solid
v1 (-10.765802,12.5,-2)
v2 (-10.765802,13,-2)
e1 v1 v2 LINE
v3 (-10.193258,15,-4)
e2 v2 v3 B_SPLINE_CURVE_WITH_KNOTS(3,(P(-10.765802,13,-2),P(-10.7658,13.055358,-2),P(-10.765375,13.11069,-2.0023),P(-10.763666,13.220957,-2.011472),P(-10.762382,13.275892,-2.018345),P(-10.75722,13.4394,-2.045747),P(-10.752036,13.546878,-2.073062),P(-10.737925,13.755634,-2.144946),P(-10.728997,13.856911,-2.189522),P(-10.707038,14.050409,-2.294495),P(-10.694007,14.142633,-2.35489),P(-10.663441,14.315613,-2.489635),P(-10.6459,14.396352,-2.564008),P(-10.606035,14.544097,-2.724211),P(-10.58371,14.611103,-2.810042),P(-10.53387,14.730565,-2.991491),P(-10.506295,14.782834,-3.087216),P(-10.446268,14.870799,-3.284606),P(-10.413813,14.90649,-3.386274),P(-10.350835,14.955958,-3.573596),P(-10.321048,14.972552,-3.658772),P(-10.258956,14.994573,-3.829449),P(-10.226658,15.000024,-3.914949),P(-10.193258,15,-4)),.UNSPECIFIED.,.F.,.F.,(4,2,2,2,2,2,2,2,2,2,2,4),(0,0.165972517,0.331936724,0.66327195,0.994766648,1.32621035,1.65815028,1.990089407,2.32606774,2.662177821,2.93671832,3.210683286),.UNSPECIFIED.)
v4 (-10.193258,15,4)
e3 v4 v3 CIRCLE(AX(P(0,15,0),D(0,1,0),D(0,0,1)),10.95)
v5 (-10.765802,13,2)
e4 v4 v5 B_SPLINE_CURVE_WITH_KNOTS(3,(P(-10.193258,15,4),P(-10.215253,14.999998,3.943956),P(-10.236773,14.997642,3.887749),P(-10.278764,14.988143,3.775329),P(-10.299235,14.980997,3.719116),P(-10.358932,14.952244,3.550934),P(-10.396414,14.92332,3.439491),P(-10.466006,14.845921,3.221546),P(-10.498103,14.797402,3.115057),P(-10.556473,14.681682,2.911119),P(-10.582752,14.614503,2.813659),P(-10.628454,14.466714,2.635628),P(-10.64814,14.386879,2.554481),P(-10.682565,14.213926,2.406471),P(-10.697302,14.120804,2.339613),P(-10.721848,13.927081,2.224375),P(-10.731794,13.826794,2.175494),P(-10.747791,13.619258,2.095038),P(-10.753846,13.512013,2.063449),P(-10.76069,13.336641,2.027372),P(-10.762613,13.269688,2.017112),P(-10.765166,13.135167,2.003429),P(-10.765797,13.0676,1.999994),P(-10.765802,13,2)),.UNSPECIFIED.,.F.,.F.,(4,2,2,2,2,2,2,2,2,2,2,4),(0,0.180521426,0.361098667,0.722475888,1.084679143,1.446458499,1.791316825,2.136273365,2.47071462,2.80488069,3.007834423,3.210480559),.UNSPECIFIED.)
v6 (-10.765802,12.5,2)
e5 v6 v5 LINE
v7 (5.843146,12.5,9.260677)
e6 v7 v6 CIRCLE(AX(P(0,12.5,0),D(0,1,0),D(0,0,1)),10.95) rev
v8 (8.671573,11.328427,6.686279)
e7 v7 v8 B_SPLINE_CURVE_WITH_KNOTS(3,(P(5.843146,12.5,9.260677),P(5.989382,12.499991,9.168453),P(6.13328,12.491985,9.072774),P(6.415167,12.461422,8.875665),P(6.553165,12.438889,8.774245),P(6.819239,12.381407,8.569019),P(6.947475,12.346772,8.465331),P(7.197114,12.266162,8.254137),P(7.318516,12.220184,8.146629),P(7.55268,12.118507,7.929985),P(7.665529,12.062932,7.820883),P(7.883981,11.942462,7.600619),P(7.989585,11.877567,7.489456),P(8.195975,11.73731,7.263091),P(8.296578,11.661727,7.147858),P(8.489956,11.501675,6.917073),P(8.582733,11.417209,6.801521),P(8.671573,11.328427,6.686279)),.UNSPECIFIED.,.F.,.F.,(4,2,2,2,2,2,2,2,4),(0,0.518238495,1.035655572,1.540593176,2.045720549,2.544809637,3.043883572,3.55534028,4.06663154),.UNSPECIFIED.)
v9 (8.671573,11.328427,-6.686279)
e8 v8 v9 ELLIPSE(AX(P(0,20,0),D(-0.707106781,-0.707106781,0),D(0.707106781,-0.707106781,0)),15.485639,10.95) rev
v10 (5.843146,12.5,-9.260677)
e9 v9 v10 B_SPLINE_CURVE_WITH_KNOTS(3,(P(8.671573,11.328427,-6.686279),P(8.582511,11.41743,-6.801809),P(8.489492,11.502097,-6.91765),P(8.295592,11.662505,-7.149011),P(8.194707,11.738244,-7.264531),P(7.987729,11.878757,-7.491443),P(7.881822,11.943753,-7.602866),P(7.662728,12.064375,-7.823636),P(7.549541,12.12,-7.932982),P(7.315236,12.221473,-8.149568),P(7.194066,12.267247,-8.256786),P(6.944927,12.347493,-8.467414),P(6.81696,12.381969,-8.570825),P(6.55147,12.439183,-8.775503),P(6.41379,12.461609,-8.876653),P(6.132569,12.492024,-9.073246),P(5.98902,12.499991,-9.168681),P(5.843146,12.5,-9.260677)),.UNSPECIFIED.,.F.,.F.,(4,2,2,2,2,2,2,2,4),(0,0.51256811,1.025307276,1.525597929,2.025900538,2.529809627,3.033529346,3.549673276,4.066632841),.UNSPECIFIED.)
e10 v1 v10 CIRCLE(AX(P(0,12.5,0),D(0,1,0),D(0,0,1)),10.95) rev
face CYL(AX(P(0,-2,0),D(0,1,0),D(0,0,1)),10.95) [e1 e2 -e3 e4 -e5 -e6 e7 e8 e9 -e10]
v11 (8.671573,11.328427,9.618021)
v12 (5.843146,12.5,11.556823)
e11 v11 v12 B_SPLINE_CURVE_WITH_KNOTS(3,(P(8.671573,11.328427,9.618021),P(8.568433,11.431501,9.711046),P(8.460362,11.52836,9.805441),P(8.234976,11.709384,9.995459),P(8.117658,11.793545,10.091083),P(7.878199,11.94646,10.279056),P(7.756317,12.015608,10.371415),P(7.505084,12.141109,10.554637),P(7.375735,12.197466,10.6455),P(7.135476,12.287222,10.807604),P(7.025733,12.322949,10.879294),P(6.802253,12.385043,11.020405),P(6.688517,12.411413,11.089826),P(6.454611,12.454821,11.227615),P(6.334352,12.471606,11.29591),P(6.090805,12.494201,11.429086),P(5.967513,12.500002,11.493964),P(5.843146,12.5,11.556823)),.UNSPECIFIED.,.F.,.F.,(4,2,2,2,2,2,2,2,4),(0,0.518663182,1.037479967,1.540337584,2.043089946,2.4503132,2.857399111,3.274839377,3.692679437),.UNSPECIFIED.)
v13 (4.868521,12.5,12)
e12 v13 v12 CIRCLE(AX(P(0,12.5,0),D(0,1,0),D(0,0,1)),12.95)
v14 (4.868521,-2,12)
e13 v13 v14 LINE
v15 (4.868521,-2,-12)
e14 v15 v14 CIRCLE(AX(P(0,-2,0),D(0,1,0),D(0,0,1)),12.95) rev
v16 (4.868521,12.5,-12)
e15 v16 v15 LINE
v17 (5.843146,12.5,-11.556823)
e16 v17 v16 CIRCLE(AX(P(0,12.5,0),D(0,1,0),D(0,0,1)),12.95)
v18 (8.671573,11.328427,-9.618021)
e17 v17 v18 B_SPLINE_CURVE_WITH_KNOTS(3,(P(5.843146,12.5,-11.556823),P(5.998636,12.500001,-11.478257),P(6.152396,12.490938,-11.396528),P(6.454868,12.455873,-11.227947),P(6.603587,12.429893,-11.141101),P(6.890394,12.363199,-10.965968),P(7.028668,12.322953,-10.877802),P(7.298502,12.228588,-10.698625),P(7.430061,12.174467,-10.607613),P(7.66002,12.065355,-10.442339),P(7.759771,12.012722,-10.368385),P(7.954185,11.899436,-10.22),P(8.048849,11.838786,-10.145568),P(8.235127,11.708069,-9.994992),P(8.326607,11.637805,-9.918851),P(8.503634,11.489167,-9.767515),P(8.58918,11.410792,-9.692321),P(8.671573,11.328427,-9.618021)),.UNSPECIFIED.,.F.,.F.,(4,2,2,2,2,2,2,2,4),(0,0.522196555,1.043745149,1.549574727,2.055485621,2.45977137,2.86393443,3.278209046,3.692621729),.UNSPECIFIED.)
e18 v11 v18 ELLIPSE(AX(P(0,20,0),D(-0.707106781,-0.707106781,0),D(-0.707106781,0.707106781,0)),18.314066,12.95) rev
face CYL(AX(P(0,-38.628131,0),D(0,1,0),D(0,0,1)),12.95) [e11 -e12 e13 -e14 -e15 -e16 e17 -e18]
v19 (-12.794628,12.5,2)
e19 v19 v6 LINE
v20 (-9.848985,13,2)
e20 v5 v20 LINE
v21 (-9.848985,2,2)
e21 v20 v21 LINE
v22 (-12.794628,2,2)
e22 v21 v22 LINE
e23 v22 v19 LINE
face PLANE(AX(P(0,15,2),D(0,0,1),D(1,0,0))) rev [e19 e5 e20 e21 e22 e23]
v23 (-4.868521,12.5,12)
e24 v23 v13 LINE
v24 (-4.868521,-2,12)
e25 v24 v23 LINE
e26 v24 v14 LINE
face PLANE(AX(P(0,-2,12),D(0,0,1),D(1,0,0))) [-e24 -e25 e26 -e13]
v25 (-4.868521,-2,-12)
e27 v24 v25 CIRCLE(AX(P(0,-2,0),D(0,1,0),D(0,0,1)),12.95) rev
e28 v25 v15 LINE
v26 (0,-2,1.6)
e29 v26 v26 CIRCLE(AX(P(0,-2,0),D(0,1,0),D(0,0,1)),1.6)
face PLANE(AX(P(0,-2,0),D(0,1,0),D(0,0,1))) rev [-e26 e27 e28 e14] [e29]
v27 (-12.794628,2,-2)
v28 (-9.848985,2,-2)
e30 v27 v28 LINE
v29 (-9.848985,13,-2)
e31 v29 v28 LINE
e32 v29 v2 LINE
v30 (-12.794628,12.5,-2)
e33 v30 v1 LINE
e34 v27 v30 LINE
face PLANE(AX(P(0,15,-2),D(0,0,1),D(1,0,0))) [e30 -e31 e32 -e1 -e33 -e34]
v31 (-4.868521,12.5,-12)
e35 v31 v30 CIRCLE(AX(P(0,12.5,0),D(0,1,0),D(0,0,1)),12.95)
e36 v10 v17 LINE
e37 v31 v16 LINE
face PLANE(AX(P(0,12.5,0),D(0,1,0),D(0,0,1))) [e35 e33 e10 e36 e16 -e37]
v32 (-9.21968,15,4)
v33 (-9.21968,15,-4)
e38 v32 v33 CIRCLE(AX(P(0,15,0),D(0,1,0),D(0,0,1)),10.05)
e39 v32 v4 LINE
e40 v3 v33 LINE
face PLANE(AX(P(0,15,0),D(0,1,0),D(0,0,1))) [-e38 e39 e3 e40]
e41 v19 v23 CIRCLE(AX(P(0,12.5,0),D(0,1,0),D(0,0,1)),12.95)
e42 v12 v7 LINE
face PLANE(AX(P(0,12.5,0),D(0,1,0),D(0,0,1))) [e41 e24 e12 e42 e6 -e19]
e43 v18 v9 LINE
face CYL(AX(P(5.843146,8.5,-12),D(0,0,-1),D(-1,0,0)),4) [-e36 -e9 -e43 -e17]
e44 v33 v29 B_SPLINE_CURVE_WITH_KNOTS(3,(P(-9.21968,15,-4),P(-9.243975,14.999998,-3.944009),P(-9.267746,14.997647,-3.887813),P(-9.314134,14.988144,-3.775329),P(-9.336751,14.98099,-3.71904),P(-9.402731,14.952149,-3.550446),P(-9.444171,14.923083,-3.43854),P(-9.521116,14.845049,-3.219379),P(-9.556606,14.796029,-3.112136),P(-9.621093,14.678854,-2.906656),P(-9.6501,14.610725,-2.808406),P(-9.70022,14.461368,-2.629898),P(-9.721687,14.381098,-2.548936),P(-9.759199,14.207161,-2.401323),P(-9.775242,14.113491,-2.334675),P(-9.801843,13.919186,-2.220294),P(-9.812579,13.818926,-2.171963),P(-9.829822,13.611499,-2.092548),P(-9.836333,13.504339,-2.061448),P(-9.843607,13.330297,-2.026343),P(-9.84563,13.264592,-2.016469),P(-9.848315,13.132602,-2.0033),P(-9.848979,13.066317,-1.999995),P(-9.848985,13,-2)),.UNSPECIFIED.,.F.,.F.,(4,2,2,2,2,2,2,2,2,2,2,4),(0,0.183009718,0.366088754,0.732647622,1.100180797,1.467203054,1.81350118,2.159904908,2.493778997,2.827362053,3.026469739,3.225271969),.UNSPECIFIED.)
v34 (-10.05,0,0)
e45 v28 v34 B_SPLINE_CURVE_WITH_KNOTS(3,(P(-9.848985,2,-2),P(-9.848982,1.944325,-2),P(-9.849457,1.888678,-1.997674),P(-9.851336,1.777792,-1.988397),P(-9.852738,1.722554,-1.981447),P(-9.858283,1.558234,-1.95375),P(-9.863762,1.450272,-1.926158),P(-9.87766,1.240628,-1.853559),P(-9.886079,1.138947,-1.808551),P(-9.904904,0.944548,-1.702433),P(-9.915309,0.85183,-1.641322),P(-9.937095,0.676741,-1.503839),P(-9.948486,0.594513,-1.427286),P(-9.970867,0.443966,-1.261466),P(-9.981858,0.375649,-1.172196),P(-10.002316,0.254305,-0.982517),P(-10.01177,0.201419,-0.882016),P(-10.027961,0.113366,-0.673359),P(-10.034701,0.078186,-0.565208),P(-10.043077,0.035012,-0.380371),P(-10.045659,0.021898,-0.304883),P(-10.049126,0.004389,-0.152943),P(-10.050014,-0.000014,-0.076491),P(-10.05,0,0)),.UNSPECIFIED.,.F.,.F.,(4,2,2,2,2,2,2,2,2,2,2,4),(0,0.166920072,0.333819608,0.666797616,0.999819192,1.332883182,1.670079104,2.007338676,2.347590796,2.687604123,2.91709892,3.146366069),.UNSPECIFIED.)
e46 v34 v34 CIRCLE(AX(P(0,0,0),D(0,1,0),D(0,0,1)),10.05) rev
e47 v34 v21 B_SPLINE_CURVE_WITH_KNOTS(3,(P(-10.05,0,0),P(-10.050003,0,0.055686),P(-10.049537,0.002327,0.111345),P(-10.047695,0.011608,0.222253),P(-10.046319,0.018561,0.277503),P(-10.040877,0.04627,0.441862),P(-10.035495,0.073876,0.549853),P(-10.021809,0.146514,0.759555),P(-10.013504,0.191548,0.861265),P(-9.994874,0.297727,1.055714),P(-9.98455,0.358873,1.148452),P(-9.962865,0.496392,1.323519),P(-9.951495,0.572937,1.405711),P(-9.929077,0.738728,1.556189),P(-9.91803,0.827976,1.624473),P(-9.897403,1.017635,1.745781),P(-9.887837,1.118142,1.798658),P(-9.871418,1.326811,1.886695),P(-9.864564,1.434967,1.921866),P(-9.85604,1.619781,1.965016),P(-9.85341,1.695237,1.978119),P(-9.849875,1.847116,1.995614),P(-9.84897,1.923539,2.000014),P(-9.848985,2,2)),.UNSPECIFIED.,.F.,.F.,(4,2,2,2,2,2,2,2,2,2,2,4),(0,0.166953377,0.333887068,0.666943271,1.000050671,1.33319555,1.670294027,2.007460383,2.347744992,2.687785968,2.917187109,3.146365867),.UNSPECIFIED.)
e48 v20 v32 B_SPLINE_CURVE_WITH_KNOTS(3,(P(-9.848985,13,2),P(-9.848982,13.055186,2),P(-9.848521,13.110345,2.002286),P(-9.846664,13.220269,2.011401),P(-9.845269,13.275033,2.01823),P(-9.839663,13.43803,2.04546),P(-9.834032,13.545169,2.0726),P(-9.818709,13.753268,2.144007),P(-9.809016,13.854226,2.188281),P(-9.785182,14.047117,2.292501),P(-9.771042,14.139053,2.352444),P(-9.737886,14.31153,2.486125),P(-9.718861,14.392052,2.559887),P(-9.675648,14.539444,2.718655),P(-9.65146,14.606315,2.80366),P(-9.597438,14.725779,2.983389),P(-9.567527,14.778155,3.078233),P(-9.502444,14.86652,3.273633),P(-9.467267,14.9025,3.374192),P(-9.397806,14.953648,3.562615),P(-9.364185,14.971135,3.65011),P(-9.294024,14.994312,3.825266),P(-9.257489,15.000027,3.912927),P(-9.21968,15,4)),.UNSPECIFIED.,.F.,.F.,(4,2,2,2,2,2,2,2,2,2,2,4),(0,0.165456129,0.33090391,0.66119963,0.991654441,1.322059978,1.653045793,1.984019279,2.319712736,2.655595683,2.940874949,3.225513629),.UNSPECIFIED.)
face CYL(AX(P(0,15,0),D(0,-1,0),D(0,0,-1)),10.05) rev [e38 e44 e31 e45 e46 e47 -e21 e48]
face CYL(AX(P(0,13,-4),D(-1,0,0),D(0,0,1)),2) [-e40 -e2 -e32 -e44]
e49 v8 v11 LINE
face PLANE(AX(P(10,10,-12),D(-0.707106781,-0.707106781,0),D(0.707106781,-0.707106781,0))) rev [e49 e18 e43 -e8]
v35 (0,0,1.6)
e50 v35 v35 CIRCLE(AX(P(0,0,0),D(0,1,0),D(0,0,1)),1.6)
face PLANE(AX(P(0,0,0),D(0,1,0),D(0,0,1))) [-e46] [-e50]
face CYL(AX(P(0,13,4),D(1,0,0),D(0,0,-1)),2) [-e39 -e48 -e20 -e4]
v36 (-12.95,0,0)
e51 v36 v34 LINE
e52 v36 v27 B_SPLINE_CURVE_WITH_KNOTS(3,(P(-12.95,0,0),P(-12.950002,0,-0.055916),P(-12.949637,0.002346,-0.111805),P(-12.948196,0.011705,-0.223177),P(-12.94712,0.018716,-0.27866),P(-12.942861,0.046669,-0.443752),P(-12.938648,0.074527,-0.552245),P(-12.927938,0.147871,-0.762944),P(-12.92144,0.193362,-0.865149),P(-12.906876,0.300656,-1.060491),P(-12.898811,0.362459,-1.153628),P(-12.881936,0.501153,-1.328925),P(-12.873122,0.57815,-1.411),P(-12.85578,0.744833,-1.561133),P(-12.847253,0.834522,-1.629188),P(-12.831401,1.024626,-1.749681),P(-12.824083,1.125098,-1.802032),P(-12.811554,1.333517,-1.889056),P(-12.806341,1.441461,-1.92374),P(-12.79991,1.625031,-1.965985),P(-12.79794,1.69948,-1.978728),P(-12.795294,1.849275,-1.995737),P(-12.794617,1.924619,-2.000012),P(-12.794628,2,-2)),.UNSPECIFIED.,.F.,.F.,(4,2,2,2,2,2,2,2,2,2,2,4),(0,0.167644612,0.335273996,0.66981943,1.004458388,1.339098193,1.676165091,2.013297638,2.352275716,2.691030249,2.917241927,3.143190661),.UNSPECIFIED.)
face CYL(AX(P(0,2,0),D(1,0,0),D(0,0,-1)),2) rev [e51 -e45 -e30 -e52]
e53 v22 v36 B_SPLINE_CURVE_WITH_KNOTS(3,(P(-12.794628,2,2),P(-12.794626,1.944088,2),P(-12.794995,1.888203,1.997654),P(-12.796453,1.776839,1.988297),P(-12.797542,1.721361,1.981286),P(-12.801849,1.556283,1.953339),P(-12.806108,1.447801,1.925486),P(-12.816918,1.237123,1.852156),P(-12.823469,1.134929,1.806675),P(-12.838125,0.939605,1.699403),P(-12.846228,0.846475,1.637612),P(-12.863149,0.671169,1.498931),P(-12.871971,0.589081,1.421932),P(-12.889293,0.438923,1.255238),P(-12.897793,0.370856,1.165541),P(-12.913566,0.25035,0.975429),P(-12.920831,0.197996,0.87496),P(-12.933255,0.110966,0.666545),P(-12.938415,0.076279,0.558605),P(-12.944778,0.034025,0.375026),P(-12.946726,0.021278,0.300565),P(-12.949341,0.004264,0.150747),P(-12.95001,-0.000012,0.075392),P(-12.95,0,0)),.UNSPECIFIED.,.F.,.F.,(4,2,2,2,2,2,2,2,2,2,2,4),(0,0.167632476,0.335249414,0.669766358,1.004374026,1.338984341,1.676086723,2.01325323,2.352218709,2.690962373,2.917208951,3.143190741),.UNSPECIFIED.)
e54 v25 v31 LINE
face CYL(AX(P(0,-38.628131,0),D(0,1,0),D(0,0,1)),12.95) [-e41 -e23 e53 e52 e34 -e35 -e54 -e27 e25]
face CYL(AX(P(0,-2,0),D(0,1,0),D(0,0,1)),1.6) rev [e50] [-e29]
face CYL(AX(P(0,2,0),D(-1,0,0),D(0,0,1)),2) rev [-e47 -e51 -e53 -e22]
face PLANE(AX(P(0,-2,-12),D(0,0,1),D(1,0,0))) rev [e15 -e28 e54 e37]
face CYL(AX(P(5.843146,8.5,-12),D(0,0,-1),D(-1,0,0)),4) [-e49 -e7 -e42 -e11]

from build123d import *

# Parameters (mm, degrees)
SKETCH1_R               = 10.95
SKETCH1_R_2             = 10.05
BOSS_EXTRUDE1_DEPTH     = 2
BOSS_EXTRUDE2_START     = 15
SKETCH1_3_R             = 10.95
SKETCH1_3_R_2           = 10.05
BOSS_EXTRUDE2_DEPTH     = 15
BOSS_EXTRUDE3_START     = -2.5
SKETCH2_R               = 12.95
SKETCH2_R_2             = 10.95
BOSS_EXTRUDE3_DEPTH     = 14.5
CUT_EXTRUDE1_DEPTH      = 24.672874773
CUT_EXTRUDE1_DEPTH_BACK = 24.672874773
SKETCH3_W               = 100
SKETCH3_H               = 24
CUT_EXTRUDE3_DEPTH      = 24.166840527
CUT_EXTRUDE3_DEPTH_BACK = 24.166840527
BOSS_EXTRUDE4_START     = 15
SKETCH1_4_R             = 10.95
SKETCH1_4_R_2           = 10.05
BOSS_EXTRUDE4_DEPTH     = 15
SKETCH5_W               = 18
SKETCH5_H               = 4
CUT_EXTRUDE4_DEPTH      = 24.166840527
FILLET1_R               = 2
FILLET2_R               = 4
CUT_EXTRUDE5_DEPTH      = 24.166840699
CUT_EXTRUDE5_DEPTH_BACK = 24.166840699
SKETCH6_R               = 1.6


with BuildPart() as part:
    # Sketch1 → Boss-Extrude1 (new body)
    # profile 1 of 2: a face of its own
    with BuildSketch(Plane(origin=(0, 0, 0), x_dir=(1, 0, 0), z_dir=(0, 1, 0))):
        with Locations(Location((0, 0, 0), (0, 0, 270))):
            Circle(SKETCH1_R)
        Circle(SKETCH1_R_2, mode=Mode.SUBTRACT)
    # profile 2 of 2: a face of its own
    with BuildSketch(Plane(origin=(0, 0, 0), x_dir=(1, 0, 0), z_dir=(0, 1, 0))):
        Circle(SKETCH1_R_2)
    extrude(amount=-BOSS_EXTRUDE1_DEPTH)

    # Sketch1<3> → Boss-Extrude2 (add)
    with BuildSketch(Plane(origin=(0, 0, 0), x_dir=(1, 0, 0), z_dir=(0, 1, 0)).offset(BOSS_EXTRUDE2_START)):
        with Locations(Location((0, 0, 0), (0, 0, 270))):
            Circle(SKETCH1_3_R)
        with Locations(Location((0, 0, 0), (0, 0, 270))):
            Circle(SKETCH1_3_R_2, mode=Mode.SUBTRACT)
    extrude(amount=-BOSS_EXTRUDE2_DEPTH)

    # Sketch2 → Boss-Extrude3 (add)
    with BuildSketch(Plane(origin=(0, 15, 0), x_dir=(1, 0, 0), z_dir=(0, 1, 0)).offset(BOSS_EXTRUDE3_START)):
        with Locations(Location((0, 0, 0), (0, 0, 270))):
            Circle(SKETCH2_R)
        with Locations(Location((0, 0, 0), (0, 0, 270))):
            Circle(SKETCH2_R_2, mode=Mode.SUBTRACT)
    extrude(amount=-BOSS_EXTRUDE3_DEPTH)

    # Sketch3 → Cut-Extrude1 (cut, two sides: drawn at the far end of the back side and taken through both)
    with BuildSketch(Plane(origin=(0, 0, 0), x_dir=(1, 0, 0), z_dir=(0, 1, 0)).offset(-CUT_EXTRUDE1_DEPTH_BACK)):
        with Locations((0, -24)):
            Rectangle(SKETCH3_W, SKETCH3_H)
        with Locations((0, 24)):
            Rectangle(SKETCH3_W, SKETCH3_H)
    extrude(amount=CUT_EXTRUDE1_DEPTH + CUT_EXTRUDE1_DEPTH_BACK, mode=Mode.SUBTRACT)

    # Sketch4 → Cut-Extrude3 (cut, two sides: drawn at the far end of the back side and taken through both)
    with BuildSketch(Plane.XY.offset(-CUT_EXTRUDE3_DEPTH_BACK)):
        Polygon((13, 15), (5, 15), (13, 7), align=None)
    extrude(amount=CUT_EXTRUDE3_DEPTH + CUT_EXTRUDE3_DEPTH_BACK, mode=Mode.SUBTRACT)

    # Sketch1<4> → Boss-Extrude4 (add)
    with BuildSketch(Plane(origin=(0, 0, 0), x_dir=(1, 0, 0), z_dir=(0, 1, 0)).offset(BOSS_EXTRUDE4_START)):
        with Locations(Location((0, 0, 0), (0, 0, 270))):
            Circle(SKETCH1_4_R)
        with Locations(Location((0, 0, 0), (0, 0, 270))):
            Circle(SKETCH1_4_R_2, mode=Mode.SUBTRACT)
    extrude(amount=-BOSS_EXTRUDE4_DEPTH)

    # Sketch5 → Cut-Extrude4 (cut, through all)
    with BuildSketch(Plane(origin=(0, 0, 0), x_dir=(1, 0, 0), z_dir=(0, 1, 0))):
        with Locations((-11, 0)):
            Rectangle(SKETCH5_W, SKETCH5_H)
    extrude(amount=CUT_EXTRUDE4_DEPTH, mode=Mode.SUBTRACT)

    # Fillet1
    fillet1_edges = [part.edges().sort_by_distance(p)[0] for p in [
        (-10.307393529, 15, 2),
        (-10.307393529, 15, -2),
        (-11.321806249, 0, -2),
        (-11.321806249, 0, 2),
    ]]
    fillet(fillet1_edges, radius=FILLET1_R - 0.0001)  # a hair under: the kernel refuses the full size

    # Fillet2
    fillet2_edges = [part.edges().sort_by_distance(p)[0] for p in [
        (7.5, 12.5, 9.26767915),
        (7.5, 12.5, -9.26767915),
    ]]
    fillet(fillet2_edges, radius=FILLET2_R)

    # Sketch6 → Cut-Extrude5 (cut, two sides: drawn at the far end of the back side and taken through both)
    with BuildSketch(Plane(origin=(0, 0, 0), x_dir=(1, 0, 0), z_dir=(0, 1, 0)).offset(-CUT_EXTRUDE5_DEPTH_BACK)):
        with Locations(Location((0, 0, 0), (0, 0, 270))):
            Circle(SKETCH6_R)
    extrude(amount=CUT_EXTRUDE5_DEPTH + CUT_EXTRUDE5_DEPTH_BACK, mode=Mode.SUBTRACT)


solid = part.part
